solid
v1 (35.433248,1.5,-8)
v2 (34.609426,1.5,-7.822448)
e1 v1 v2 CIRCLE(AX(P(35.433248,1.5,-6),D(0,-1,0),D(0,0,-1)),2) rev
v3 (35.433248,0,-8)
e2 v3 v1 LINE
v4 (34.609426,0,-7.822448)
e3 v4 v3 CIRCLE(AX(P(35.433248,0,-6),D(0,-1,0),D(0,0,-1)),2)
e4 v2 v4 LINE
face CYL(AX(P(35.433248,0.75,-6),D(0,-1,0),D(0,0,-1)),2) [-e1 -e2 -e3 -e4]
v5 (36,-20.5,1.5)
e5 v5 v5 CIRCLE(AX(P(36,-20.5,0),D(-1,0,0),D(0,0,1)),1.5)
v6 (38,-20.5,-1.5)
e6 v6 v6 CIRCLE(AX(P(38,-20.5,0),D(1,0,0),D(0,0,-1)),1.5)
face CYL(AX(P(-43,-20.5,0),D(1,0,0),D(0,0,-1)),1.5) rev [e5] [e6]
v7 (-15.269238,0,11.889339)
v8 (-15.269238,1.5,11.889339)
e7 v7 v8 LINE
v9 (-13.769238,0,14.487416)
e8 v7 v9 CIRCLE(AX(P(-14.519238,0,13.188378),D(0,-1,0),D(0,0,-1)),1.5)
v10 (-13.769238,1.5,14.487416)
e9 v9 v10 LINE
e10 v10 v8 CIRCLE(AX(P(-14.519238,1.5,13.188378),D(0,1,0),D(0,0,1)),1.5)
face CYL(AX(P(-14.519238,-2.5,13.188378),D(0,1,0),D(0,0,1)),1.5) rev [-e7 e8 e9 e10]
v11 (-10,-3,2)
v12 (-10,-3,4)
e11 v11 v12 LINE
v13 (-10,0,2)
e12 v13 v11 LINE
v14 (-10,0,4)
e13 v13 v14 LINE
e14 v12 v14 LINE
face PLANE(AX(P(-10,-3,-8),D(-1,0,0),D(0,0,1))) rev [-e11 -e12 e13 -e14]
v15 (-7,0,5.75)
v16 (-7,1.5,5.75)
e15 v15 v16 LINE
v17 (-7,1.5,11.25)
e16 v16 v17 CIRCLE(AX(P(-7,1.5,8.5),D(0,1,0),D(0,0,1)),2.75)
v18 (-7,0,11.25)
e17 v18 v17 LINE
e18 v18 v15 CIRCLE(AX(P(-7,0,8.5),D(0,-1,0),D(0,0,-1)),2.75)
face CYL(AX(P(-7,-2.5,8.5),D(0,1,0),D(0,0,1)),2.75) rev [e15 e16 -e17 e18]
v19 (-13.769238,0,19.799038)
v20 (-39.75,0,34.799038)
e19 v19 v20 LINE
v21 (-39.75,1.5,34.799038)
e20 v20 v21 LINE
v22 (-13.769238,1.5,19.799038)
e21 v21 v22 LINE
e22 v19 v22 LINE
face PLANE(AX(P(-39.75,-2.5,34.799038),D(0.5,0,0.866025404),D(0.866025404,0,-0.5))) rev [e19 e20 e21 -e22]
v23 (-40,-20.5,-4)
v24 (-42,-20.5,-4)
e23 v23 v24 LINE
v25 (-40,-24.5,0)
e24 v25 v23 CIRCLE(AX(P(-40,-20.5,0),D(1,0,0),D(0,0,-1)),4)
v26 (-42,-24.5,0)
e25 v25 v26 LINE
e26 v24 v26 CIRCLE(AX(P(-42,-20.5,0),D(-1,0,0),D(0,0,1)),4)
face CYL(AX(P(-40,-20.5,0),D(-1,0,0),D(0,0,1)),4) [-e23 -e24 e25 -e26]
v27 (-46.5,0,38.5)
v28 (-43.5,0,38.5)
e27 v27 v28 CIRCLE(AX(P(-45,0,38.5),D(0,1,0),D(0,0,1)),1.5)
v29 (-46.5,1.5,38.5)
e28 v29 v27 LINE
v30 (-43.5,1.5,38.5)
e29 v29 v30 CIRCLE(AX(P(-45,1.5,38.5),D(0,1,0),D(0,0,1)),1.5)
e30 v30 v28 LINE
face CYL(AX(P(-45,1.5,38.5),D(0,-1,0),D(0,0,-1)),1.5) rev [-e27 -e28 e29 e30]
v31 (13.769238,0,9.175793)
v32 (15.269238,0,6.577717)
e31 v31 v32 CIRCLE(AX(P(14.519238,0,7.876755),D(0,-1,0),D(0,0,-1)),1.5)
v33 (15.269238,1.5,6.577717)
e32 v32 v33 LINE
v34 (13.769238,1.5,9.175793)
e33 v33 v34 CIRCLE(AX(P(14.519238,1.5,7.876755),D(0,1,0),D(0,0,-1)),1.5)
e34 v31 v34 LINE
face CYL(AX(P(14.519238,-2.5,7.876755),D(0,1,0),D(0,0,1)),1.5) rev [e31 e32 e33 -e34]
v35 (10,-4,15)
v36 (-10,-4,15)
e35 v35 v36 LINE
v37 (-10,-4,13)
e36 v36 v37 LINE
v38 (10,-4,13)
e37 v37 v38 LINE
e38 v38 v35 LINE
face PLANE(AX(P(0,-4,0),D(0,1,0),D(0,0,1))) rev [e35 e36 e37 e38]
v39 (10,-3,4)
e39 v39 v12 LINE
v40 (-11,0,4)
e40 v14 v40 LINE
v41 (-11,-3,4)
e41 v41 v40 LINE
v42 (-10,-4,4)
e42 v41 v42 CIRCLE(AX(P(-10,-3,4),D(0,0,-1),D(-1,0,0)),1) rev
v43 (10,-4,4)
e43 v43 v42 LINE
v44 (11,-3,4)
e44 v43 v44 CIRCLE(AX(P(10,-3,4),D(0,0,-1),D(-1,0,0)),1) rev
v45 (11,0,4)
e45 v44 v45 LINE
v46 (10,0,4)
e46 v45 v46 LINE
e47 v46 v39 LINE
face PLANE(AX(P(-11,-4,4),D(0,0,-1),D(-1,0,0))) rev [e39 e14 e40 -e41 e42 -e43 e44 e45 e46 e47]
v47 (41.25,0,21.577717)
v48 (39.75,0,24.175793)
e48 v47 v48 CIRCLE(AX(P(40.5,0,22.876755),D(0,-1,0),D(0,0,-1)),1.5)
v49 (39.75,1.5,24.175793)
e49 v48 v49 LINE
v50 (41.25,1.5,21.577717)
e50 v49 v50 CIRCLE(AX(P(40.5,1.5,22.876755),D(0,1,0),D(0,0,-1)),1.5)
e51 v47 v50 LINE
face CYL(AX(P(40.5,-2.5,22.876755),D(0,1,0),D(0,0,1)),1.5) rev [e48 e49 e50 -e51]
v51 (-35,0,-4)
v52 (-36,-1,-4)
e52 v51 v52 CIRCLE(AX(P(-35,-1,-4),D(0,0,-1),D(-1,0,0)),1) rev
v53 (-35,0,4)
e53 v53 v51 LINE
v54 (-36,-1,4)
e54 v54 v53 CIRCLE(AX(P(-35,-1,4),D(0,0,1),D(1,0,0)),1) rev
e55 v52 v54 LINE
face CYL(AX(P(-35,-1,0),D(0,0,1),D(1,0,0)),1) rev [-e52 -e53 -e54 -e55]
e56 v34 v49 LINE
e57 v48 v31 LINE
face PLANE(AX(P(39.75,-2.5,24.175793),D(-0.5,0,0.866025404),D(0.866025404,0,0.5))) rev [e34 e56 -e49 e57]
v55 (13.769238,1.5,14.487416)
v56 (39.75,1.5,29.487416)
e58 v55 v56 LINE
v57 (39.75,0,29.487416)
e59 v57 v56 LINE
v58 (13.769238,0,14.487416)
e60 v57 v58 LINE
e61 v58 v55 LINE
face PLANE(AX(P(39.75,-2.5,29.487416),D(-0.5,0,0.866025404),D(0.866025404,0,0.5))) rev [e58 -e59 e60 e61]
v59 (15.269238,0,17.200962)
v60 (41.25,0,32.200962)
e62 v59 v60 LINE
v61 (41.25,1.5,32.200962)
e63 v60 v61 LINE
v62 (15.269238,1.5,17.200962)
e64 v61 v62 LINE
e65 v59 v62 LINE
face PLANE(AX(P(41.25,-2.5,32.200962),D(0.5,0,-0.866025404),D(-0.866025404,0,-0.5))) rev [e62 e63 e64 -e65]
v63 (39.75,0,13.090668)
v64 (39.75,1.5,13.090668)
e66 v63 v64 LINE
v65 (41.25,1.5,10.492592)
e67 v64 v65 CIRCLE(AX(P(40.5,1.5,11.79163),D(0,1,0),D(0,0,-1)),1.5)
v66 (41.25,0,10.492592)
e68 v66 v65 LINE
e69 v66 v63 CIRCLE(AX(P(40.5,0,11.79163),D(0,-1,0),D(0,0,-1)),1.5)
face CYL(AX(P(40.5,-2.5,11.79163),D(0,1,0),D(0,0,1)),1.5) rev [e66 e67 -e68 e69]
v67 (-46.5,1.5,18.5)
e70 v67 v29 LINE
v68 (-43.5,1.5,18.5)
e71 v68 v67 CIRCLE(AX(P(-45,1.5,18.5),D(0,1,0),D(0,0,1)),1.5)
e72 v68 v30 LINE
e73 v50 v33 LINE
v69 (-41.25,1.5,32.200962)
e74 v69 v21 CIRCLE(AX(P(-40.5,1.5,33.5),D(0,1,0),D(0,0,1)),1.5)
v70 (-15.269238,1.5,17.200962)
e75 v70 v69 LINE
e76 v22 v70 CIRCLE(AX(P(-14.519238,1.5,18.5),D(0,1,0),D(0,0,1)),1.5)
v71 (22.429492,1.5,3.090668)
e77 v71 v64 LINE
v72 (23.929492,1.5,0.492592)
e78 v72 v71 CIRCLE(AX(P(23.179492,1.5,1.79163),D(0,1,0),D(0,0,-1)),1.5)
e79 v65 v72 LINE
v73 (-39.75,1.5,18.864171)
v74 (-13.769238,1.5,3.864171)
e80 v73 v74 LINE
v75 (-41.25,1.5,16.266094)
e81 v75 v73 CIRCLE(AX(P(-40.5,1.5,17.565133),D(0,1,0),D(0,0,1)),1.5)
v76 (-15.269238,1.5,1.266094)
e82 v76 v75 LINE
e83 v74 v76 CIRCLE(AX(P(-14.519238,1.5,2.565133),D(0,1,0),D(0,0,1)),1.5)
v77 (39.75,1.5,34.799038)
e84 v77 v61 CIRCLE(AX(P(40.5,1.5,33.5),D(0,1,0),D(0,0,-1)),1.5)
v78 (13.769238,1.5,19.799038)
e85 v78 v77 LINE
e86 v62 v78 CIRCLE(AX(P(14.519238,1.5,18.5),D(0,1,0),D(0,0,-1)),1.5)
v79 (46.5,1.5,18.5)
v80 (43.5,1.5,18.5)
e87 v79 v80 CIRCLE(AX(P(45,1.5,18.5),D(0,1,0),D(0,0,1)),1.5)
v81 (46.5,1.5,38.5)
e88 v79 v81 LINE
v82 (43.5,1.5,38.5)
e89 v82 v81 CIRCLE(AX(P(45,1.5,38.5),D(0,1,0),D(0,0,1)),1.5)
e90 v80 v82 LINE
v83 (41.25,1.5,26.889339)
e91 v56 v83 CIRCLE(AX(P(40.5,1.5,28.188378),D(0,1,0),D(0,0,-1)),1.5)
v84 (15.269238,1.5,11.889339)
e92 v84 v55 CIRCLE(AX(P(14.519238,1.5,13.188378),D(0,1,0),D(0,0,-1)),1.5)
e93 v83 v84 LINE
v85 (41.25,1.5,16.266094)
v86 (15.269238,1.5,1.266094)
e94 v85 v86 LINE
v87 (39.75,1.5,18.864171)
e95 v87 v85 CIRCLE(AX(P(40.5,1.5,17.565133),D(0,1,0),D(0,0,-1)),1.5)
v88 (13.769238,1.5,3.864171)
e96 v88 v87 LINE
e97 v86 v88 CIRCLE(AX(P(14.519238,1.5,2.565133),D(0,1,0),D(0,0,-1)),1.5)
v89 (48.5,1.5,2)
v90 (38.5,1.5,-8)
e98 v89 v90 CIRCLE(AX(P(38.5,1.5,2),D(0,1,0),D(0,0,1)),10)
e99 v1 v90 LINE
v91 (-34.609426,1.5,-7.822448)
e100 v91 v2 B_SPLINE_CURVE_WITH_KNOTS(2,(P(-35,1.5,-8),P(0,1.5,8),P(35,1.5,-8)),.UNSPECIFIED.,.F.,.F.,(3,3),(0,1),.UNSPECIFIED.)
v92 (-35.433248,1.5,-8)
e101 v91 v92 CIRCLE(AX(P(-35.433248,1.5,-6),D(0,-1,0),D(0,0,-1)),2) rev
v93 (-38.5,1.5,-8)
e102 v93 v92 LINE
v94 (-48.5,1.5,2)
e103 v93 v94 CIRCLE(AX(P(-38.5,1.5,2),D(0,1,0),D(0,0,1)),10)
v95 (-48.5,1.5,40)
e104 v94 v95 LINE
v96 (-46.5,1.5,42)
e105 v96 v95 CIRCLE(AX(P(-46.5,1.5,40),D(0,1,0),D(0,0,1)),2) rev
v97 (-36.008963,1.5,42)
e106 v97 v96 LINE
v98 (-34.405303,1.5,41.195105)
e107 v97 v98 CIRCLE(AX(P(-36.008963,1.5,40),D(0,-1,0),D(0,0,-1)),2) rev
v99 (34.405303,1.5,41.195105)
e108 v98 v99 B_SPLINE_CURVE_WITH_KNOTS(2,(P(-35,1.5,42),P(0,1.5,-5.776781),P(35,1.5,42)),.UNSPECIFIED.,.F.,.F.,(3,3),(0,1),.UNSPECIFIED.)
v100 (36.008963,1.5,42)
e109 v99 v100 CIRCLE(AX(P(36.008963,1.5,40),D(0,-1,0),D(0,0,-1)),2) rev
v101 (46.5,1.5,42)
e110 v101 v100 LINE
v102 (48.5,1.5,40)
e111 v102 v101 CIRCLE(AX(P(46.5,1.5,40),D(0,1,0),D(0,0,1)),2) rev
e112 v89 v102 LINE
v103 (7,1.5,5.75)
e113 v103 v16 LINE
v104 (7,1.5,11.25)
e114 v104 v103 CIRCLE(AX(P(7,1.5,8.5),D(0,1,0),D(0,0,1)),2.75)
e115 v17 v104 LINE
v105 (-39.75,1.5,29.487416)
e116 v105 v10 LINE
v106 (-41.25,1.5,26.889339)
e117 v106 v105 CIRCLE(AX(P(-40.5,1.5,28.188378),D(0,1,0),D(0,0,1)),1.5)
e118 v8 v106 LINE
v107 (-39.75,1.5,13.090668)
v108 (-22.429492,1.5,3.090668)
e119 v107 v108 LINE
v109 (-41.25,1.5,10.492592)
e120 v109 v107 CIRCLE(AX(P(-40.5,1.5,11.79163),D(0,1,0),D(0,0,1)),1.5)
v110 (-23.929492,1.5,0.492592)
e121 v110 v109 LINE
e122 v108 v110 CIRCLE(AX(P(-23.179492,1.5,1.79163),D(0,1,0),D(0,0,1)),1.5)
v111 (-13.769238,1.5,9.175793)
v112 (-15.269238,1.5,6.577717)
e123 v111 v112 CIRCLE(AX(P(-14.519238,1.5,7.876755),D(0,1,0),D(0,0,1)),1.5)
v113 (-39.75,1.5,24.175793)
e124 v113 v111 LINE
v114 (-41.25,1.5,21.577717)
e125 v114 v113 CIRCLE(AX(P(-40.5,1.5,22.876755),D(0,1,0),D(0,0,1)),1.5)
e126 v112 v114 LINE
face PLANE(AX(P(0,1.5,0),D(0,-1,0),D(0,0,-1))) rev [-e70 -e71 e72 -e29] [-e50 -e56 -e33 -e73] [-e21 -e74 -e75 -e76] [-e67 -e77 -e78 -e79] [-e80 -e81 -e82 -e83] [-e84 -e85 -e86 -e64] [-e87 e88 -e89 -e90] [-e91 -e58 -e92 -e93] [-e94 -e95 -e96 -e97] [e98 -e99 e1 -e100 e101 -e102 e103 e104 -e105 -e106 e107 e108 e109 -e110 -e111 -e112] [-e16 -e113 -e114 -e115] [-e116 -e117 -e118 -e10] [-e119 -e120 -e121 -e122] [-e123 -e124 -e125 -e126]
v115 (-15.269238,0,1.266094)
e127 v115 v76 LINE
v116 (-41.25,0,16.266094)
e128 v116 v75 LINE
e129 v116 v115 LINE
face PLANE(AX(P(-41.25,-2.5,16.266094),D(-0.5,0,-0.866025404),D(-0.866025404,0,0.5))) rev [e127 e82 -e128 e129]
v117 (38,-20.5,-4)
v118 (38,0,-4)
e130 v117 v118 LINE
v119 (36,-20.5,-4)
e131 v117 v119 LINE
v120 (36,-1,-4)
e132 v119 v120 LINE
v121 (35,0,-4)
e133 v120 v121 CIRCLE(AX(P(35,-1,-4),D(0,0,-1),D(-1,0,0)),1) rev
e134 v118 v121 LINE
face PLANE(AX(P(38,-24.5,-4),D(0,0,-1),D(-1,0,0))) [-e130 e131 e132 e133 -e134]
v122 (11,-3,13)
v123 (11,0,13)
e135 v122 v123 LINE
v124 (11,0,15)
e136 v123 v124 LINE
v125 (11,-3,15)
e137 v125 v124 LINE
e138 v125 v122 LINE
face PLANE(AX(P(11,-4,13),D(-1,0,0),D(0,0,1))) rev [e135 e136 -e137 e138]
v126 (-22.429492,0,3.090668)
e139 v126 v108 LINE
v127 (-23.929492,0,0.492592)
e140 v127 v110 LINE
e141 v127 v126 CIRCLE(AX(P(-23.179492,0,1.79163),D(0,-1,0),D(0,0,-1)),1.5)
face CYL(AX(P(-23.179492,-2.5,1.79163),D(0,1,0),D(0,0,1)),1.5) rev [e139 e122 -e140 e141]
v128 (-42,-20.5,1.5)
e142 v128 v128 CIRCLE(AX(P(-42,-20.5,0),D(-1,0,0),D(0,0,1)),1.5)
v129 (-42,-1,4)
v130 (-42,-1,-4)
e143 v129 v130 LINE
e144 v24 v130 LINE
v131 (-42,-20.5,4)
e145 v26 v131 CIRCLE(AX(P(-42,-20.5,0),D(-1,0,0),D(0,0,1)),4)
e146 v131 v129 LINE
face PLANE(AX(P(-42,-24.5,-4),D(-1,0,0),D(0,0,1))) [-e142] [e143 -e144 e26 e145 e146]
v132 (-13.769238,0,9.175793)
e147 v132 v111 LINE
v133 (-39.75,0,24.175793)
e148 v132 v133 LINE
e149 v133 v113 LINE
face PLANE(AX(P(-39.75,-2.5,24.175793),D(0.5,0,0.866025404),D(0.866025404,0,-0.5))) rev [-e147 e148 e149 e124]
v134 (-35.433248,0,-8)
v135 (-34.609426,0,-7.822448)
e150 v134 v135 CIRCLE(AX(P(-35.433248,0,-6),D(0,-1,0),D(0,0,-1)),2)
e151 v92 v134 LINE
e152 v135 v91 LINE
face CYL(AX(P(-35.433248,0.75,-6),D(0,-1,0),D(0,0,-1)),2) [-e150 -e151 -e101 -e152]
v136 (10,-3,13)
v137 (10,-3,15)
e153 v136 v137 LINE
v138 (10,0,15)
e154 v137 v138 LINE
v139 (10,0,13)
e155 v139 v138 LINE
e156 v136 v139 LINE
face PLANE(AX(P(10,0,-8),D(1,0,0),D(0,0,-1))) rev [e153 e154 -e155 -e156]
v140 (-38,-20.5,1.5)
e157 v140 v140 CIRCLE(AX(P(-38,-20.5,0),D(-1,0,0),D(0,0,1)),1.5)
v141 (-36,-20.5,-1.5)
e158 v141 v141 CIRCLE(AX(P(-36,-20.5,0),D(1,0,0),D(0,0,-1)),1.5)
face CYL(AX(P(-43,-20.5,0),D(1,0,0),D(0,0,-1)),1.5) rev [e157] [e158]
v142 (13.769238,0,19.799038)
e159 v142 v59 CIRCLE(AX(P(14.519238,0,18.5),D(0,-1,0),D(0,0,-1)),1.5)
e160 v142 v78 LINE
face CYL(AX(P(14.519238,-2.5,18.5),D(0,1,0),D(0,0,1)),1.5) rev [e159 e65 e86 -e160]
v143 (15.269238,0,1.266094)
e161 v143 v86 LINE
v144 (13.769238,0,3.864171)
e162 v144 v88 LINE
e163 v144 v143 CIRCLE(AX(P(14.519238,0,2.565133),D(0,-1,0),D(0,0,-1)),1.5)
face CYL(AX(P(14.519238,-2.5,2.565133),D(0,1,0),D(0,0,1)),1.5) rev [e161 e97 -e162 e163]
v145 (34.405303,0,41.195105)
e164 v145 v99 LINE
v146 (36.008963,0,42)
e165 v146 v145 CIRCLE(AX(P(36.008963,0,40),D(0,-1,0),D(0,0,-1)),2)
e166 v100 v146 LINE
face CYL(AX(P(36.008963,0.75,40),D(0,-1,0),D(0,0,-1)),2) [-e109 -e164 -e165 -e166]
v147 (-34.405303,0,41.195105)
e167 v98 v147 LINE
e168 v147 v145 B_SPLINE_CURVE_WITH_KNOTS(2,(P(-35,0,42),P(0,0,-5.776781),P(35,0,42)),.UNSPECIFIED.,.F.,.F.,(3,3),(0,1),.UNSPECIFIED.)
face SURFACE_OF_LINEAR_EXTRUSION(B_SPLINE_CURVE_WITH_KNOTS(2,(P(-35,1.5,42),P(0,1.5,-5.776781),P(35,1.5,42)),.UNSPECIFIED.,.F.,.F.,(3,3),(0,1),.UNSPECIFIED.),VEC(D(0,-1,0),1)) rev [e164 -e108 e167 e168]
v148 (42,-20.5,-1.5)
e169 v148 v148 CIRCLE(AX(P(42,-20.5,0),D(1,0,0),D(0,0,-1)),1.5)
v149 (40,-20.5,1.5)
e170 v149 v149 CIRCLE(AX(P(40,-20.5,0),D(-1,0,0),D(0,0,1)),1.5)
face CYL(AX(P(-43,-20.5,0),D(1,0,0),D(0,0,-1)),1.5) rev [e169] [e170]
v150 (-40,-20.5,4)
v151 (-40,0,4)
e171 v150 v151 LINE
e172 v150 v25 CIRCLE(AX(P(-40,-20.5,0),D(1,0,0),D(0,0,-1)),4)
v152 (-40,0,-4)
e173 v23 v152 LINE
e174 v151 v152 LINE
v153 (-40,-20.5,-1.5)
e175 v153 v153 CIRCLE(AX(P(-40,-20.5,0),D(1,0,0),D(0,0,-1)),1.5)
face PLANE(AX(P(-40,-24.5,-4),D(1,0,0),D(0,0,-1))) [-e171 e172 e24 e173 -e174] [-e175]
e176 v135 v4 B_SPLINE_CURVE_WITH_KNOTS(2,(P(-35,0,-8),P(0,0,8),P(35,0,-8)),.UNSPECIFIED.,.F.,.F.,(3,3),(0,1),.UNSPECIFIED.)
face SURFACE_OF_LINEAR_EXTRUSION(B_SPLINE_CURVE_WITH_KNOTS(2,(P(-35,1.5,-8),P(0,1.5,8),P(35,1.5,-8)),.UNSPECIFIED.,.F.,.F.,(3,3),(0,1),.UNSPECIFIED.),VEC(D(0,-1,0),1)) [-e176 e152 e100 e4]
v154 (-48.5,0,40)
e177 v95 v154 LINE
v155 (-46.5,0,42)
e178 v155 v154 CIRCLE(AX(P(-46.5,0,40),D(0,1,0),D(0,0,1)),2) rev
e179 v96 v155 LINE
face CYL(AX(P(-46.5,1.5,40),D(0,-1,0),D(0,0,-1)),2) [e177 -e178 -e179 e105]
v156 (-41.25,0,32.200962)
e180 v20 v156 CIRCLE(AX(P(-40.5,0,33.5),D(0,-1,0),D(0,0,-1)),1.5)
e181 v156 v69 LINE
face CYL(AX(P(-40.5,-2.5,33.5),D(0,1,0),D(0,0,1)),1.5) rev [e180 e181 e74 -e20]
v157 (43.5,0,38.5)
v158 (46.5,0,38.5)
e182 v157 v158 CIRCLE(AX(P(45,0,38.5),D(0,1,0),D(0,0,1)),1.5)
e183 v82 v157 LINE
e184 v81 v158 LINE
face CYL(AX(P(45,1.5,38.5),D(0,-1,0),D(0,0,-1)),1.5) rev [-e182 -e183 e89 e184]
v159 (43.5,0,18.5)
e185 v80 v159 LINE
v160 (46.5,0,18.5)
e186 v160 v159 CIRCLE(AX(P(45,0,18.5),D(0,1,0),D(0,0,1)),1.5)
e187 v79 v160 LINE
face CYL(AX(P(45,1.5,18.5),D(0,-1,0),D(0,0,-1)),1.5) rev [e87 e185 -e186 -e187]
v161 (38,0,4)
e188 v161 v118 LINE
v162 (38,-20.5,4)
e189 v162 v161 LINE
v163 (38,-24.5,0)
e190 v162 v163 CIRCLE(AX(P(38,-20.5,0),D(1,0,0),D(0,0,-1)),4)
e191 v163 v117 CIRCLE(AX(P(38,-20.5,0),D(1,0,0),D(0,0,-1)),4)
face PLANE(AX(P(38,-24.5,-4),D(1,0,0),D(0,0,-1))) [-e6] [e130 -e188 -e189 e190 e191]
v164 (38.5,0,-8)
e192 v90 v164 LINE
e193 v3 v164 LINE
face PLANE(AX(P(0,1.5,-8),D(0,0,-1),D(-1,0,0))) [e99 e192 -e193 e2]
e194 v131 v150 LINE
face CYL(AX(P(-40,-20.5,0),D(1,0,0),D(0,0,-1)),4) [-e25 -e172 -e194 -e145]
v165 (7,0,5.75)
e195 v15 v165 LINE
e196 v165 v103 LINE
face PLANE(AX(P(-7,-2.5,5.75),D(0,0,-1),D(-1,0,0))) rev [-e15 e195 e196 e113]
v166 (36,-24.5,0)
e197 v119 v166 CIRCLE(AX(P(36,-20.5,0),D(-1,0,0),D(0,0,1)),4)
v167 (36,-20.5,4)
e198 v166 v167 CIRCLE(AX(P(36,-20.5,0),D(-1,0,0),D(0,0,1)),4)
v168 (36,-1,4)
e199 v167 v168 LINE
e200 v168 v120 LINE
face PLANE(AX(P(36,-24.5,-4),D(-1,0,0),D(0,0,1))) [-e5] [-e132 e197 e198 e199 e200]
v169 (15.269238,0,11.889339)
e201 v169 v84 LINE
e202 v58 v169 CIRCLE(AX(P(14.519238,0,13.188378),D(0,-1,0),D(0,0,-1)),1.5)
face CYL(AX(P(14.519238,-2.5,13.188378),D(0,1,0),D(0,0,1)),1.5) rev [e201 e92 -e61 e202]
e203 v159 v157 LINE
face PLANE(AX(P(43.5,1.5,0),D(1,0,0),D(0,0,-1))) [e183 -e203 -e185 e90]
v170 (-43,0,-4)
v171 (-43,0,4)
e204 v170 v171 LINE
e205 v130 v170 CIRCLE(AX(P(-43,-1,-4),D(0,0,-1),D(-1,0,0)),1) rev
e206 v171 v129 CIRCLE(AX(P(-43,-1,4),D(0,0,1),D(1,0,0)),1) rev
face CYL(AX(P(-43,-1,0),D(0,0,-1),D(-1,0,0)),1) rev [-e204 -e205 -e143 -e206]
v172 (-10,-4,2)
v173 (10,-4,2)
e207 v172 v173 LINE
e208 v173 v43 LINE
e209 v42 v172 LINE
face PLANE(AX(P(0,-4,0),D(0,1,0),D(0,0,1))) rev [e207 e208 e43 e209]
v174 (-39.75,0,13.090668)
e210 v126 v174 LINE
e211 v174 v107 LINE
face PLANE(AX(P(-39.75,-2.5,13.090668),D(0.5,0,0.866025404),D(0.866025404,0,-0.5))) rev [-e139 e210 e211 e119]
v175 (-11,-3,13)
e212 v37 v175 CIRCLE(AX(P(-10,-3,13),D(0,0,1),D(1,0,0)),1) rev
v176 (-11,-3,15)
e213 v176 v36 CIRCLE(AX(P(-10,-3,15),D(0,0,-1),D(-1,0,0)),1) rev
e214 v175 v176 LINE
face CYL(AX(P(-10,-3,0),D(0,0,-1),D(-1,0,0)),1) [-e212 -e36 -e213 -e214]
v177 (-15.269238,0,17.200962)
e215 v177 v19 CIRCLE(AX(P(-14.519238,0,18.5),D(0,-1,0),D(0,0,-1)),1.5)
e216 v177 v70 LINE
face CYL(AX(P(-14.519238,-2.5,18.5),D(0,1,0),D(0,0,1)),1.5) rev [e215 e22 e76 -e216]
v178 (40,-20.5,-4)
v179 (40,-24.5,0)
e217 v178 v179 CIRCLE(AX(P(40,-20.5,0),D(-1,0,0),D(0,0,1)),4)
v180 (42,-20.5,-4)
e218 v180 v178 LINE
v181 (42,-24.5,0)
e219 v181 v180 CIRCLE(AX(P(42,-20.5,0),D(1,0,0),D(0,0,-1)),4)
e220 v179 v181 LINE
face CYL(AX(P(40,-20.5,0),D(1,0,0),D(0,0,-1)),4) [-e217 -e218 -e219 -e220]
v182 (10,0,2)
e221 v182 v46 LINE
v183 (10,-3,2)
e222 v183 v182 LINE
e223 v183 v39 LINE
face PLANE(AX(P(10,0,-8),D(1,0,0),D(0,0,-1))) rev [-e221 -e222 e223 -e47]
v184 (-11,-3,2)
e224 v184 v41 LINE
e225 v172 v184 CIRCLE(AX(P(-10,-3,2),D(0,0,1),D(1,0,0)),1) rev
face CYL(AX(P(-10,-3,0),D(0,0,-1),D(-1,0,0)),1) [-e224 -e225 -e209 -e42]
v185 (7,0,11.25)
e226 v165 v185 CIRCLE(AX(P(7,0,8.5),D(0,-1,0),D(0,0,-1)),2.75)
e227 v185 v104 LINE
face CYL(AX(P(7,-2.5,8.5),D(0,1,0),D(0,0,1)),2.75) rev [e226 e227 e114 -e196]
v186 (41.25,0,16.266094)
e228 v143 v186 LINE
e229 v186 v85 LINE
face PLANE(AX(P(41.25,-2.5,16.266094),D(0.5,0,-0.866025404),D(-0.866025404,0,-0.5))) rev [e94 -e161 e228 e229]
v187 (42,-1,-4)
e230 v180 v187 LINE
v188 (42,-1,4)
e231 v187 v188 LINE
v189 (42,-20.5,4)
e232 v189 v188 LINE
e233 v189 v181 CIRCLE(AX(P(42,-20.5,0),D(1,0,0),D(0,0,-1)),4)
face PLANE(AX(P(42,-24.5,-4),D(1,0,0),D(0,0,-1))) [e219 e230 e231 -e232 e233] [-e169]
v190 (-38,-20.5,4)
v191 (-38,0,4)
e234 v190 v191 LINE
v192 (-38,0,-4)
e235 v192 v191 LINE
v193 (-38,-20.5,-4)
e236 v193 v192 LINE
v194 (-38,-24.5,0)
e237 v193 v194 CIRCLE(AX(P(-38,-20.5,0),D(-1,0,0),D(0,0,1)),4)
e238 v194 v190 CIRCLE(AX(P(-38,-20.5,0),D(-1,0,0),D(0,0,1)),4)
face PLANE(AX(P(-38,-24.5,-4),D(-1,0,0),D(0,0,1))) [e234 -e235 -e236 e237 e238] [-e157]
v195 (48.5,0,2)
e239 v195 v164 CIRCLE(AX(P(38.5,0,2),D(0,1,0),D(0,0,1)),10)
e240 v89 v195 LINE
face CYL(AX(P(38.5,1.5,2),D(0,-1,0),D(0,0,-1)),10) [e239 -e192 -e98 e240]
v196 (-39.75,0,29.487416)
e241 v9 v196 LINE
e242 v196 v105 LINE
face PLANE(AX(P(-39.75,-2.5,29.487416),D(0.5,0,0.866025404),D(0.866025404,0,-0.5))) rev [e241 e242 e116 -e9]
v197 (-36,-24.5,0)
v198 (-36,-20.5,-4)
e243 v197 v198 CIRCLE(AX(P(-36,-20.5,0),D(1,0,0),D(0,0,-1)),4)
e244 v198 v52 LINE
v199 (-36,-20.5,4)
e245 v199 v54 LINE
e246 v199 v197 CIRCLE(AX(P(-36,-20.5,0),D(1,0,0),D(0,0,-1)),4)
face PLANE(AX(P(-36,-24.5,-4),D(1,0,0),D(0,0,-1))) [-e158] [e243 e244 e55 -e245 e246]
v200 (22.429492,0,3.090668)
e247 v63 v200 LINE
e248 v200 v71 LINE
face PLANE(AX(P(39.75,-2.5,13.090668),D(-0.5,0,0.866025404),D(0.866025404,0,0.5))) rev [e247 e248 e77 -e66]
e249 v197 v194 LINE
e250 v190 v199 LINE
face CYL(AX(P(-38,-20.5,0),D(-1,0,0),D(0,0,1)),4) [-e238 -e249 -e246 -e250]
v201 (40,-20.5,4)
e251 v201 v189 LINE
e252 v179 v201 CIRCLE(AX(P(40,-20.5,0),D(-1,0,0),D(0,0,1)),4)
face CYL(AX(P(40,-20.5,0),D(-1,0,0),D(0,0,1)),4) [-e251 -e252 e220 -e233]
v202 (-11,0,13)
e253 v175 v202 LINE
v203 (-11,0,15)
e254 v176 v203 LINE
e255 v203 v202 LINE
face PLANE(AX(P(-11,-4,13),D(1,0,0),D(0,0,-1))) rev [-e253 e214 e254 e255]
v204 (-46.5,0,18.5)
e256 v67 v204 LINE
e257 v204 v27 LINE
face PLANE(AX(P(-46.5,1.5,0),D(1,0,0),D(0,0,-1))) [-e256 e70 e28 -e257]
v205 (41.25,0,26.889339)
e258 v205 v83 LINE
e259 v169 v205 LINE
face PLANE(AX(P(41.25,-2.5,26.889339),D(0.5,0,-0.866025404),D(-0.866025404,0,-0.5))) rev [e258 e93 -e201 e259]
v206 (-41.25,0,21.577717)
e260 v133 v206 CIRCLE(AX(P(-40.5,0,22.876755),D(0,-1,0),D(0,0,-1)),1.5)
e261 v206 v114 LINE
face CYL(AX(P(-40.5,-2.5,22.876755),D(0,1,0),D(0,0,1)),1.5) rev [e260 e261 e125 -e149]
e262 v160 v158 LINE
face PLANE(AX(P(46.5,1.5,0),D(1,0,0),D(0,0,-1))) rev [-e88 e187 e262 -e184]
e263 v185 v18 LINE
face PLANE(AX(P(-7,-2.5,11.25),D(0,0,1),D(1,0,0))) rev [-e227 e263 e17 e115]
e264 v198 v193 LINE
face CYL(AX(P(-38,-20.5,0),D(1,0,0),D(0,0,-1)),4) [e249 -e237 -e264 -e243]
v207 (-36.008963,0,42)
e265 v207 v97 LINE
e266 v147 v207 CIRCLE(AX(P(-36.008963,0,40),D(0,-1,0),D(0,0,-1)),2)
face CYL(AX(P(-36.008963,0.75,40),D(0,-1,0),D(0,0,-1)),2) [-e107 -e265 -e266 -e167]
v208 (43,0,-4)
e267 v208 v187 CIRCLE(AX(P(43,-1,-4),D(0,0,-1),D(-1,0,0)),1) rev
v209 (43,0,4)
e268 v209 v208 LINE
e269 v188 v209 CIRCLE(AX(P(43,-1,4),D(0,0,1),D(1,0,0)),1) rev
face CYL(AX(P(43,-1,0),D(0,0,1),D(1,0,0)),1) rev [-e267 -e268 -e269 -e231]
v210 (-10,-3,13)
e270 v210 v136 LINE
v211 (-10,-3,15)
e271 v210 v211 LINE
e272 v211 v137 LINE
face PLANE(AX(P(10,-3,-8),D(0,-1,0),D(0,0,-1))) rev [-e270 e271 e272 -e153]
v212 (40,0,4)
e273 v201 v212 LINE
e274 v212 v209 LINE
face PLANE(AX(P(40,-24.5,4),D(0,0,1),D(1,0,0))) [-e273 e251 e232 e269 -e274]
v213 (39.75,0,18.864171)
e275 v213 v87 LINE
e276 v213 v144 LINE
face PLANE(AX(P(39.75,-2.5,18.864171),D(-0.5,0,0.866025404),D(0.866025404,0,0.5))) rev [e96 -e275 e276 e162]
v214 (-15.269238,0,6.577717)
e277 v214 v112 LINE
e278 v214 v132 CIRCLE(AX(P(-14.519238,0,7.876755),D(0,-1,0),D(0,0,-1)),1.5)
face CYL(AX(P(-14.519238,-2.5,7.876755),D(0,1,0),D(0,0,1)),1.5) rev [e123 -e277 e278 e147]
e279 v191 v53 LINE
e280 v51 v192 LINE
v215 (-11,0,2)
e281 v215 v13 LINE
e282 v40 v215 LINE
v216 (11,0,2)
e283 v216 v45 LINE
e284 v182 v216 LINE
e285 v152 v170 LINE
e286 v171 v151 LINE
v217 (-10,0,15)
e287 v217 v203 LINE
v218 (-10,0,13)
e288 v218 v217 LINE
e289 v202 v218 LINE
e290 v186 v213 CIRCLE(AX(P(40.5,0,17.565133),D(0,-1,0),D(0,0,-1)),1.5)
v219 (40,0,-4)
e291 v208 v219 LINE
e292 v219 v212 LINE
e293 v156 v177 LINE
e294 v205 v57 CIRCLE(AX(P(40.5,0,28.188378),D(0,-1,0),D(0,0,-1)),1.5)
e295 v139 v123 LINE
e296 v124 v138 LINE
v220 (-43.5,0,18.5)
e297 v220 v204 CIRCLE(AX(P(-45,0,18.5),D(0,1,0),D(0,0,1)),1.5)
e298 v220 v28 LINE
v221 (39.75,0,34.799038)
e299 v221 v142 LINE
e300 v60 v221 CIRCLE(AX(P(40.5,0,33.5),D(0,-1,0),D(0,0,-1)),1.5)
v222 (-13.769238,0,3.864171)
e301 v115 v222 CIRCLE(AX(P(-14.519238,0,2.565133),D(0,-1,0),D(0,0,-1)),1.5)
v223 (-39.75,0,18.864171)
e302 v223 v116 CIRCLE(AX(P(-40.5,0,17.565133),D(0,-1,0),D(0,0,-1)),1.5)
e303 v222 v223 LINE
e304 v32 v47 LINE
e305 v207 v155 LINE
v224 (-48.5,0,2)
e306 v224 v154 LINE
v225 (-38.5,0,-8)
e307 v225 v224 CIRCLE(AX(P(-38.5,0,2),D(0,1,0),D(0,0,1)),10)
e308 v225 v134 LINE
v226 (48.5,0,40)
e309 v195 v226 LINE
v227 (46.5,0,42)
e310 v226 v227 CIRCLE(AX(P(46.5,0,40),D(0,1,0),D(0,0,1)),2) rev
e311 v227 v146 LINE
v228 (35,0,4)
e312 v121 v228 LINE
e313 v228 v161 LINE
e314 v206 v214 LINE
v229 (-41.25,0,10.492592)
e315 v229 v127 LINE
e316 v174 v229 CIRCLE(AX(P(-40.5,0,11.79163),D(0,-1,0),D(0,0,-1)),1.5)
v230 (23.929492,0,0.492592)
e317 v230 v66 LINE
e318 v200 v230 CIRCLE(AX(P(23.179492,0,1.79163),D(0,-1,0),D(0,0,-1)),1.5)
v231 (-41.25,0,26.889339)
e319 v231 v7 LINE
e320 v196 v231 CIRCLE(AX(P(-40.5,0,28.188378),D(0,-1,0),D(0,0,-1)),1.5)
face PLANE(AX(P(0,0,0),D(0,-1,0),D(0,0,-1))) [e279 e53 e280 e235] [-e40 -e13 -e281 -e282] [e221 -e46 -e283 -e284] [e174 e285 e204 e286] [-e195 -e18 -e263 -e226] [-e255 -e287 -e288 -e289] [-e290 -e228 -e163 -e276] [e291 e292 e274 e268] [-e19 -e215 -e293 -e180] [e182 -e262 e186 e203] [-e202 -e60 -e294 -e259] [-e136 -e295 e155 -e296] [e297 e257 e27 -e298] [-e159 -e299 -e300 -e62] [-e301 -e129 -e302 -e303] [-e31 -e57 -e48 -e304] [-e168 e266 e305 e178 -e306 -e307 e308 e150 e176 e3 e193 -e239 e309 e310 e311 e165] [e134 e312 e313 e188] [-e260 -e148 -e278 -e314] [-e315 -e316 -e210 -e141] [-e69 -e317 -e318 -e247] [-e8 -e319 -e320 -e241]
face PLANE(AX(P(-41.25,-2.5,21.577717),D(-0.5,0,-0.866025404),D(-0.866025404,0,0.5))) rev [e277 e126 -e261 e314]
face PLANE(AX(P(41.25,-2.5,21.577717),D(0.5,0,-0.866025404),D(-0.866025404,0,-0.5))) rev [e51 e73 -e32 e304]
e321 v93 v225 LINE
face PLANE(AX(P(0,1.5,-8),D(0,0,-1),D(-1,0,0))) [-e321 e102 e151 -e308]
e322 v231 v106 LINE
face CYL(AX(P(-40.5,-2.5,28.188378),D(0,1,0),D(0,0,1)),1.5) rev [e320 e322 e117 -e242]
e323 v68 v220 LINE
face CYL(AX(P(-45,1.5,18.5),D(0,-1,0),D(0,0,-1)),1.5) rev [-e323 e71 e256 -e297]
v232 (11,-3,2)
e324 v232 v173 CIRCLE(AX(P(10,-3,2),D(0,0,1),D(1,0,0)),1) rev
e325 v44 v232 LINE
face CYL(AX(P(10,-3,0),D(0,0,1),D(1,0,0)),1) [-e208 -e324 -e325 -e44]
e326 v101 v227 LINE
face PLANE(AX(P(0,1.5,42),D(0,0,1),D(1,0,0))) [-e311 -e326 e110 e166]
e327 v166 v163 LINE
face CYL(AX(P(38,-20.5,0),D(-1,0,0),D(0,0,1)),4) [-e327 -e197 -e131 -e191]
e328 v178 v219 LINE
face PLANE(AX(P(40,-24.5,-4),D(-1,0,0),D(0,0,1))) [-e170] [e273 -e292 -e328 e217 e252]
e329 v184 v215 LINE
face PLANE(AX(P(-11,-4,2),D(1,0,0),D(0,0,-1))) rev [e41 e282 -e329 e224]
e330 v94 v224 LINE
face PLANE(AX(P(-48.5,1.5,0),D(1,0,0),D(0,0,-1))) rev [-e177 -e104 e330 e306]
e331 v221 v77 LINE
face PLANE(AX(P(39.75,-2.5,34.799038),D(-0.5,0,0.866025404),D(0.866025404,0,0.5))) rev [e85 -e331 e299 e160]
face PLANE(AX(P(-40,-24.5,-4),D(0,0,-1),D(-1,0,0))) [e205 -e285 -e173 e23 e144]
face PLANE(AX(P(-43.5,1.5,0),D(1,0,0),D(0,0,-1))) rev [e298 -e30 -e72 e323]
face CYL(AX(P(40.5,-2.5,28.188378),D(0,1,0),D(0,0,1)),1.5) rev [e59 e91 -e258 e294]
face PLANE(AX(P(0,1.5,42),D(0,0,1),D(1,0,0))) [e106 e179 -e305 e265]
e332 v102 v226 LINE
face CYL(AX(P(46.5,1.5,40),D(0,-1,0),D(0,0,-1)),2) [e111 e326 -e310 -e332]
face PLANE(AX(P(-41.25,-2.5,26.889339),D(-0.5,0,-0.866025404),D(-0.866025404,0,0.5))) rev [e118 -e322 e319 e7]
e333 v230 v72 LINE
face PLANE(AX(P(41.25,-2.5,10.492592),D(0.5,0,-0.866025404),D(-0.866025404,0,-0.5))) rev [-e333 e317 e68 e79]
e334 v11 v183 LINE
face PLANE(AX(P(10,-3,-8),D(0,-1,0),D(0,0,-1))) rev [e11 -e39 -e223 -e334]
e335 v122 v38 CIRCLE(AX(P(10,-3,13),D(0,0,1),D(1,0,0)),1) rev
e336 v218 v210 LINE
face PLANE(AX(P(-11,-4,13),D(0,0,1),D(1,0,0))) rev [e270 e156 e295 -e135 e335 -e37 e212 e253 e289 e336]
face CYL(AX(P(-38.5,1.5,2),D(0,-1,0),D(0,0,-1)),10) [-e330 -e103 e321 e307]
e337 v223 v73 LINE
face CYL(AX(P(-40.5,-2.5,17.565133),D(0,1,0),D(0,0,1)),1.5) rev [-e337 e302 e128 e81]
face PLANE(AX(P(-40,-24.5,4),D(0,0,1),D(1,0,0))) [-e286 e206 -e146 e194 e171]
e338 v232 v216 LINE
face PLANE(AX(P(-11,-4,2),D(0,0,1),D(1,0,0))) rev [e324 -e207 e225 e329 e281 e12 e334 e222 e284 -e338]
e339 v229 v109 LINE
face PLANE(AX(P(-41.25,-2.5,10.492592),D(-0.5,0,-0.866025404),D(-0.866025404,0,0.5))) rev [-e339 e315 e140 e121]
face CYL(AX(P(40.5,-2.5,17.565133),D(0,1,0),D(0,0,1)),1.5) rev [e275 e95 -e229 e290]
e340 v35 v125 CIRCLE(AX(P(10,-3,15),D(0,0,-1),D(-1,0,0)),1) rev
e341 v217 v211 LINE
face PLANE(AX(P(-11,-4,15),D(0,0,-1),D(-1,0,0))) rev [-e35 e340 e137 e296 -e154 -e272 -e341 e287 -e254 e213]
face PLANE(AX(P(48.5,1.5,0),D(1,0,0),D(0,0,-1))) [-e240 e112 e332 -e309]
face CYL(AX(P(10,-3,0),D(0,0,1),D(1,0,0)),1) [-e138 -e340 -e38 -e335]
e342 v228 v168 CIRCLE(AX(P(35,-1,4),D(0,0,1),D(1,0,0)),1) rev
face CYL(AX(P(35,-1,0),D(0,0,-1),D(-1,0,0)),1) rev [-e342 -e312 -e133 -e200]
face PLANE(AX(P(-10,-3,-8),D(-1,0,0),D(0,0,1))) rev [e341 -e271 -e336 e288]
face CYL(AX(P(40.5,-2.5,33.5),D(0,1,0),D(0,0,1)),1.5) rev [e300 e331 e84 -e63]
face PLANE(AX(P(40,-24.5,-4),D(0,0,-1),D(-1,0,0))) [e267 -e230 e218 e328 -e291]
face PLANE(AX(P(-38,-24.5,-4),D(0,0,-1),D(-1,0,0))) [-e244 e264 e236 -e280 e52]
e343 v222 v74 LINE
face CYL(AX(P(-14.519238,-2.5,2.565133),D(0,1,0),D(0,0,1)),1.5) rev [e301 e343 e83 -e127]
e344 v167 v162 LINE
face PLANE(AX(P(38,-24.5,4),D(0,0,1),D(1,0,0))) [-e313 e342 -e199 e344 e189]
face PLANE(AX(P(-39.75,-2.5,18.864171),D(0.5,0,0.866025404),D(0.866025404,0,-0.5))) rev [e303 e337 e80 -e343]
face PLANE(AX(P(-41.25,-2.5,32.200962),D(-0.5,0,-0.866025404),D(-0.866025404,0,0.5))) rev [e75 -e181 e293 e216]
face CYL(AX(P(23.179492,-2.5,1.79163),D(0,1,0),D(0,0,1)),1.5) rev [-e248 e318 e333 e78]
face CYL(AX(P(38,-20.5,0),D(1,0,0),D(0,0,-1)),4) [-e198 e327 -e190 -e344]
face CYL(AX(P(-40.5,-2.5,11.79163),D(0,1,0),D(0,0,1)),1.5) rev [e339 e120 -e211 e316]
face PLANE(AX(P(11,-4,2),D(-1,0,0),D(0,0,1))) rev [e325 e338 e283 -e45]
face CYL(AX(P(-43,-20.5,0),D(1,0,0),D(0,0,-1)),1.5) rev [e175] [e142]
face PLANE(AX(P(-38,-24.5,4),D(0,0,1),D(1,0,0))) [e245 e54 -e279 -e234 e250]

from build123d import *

# Parameters (mm, degrees)
SKETCH_2_W          = 8
SKETCH_2_H          = 12
EXTRUDE_1_DEPTH     = 1.5
EXTRUDE_1_2_DEPTH   = 1.5
SKETCH_3_W          = 2
SKETCH_3_H          = 8
EXTRUDE_2_DEPTH     = 24.5
FILLET_1_R          = 4
FILLET_2_R          = 4
SKETCH_4_R          = 1.5
CUT_EXTRUDE_1_DEPTH = 90.622820755
EXTRUDE_3_DEPTH     = 1.5
SKETCH_8_W          = 22
SKETCH_8_H          = 2
EXTRUDE_4_DEPTH     = 4
SKETCH_9_W          = 20
SKETCH_9_H          = 3
CUT_EXTRUDE_2_DEPTH = 61.675365801
FILLET_4_R          = 2
CUT_EXTRUDE_4_DEPTH = 4
FILLET_5_R          = 1
FILLET_6_R          = 1


with BuildPart() as part:
    # 草图2 → 凸台-拉伸1 (new body)
    with BuildSketch(Plane(origin=(0, 0, 0), x_dir=(1, 0, 0), z_dir=(0, 1, 0))):
        with Locations((-39, 0)):
            Rectangle(SKETCH_2_W, SKETCH_2_H)
    extrude(amount=EXTRUDE_1_DEPTH)



with BuildPart() as body_2:
    # 草图2 → Extrude 1 2 (new body)
    with BuildSketch(Plane(origin=(0, 0, 0), x_dir=(1, 0, 0), z_dir=(0, 1, 0))):
        with Locations((39, 0)):
            Rectangle(SKETCH_2_W, SKETCH_2_H)
    extrude(amount=EXTRUDE_1_2_DEPTH)


with BuildPart() as part_1:
    add(part.part)

    add(body_2.part)  # 凸台-拉伸2 merges body 2
    # 草图3 → 凸台-拉伸2 (add)
    with BuildSketch(Plane(origin=(0, 0, 0), x_dir=(1, 0, 0), z_dir=(0, 1, 0))):
        with Locations((-37, 0)):
            Rectangle(SKETCH_3_W, SKETCH_3_H)
        with Locations((-41, 0)):
            Rectangle(SKETCH_3_W, SKETCH_3_H)
        with Locations((41, 0)):
            Rectangle(SKETCH_3_W, SKETCH_3_H)
        with Locations((37, 0)):
            Rectangle(SKETCH_3_W, SKETCH_3_H)
    extrude(amount=-EXTRUDE_2_DEPTH)

    # 圆角1
    fillet_1_edges = [part_1.edges().sort_by_distance(p)[0] for p in [
        (-41, -24.5, -4),
        (-37, -24.5, -4),
        (-37, -24.5, 4),
        (-41, -24.5, 4),
    ]]
    fillet(fillet_1_edges, radius=FILLET_1_R - 0.0001)  # a hair under: the kernel refuses the full size

    # 圆角2
    fillet_2_edges = [part_1.edges().sort_by_distance(p)[0] for p in [
        (37, -24.5, 4),
        (41, -24.5, 4),
        (41, -24.5, -4),
        (37, -24.5, -4),
    ]]
    fillet(fillet_2_edges, radius=FILLET_2_R - 0.0001)  # a hair under: the kernel refuses the full size

    # 草图4 → 切除-拉伸1 (cut, through all)
    with BuildSketch(Plane(origin=(43, 0, 0), x_dir=(0, 0, -1), z_dir=(1, 0, 0))):
        with Locations((0, -20.5)):
            Circle(SKETCH_4_R)
    extrude(amount=-CUT_EXTRUDE_1_DEPTH, mode=Mode.SUBTRACT)

    # 草图6 → 凸台-拉伸3 (add)
    with BuildSketch(Plane(origin=(0, 0, 0), x_dir=(1, 0, 0), z_dir=(0, 1, 0))):
        with BuildLine():
            Line((48.5, -2), (48.5, -40))
            ThreePointArc((48.5, -40), (47.914213562, -41.414213562), (46.5, -42))
            Line((46.5, -42), (35, -42))
            add(Edge.make_bspline(
                [(-35, -42), (0, 5.776780805), (35, -42)],
                knots=[0, 0, 0, 1, 1, 1], degree=2))
            Line((-35, -42), (-46.5, -42))
            ThreePointArc((-46.5, -42), (-47.914213562, -41.414213562), (-48.5, -40))
            Line((-48.5, -40), (-48.5, -2))
            ThreePointArc((-48.5, -2), (-45.571067812, 5.071067812), (-38.5, 8))
            Line((-38.5, 8), (-35, 8))
            add(Edge.make_bspline(
                [(-35, 8), (0, -8), (35, 8)],
                knots=[0, 0, 0, 1, 1, 1], degree=2))
            Line((35, 8), (38.5, 8))
            ThreePointArc((38.5, 8), (45.571067812, 5.071067812), (48.5, -2))
        make_face()
        with BuildLine():
            Line((-43.5, -18.5), (-43.5, -38.5))
            ThreePointArc((-43.5, -38.5), (-45, -40), (-46.5, -38.5))
            Line((-46.5, -38.5), (-46.5, -18.5))
            ThreePointArc((-46.5, -18.5), (-45, -17), (-43.5, -18.5))
        make_face(mode=Mode.SUBTRACT)
        with BuildLine():
            Line((46.5, -18.5), (46.5, -38.5))
            ThreePointArc((46.5, -38.5), (45, -40), (43.5, -38.5))
            Line((43.5, -38.5), (43.5, -18.5))
            ThreePointArc((43.5, -18.5), (45, -17), (46.5, -18.5))
        make_face(mode=Mode.SUBTRACT)
    extrude(amount=EXTRUDE_3_DEPTH)

    # 草图8 → 凸台-拉伸4 (add)
    with BuildSketch(Plane(origin=(0, 0, 0), x_dir=(-1, 0, 0), z_dir=(0, -1, 0))):
        with Locations((0, -3)):
            Rectangle(SKETCH_8_W, SKETCH_8_H)
        with Locations((0, -14)):
            Rectangle(SKETCH_8_W, SKETCH_8_H)
    extrude(amount=EXTRUDE_4_DEPTH)

    # 草图9 → 切除-拉伸2 (cut, through all)
    with BuildSketch(Plane.XY.offset(15)):
        with Locations((0, -1.5)):
            Rectangle(SKETCH_9_W, SKETCH_9_H)
    extrude(amount=-CUT_EXTRUDE_2_DEPTH, mode=Mode.SUBTRACT)

    # 圆角4
    fillet_4_edges = [part_1.edges().sort_by_distance(p)[0] for p in [
        (-35, 0.75, -8),
        (35, 0.75, -8),
        (35, 0.75, 42),
        (-35, 0.75, 42),
    ]]
    fillet(fillet_4_edges, radius=FILLET_4_R)

    # 草图13 → 切除-拉伸4 (cut)
    with BuildSketch(Plane(origin=(0, 1.5, 0), x_dir=(1, 0, 0), z_dir=(0, 1, 0))):
        with BuildLine():
            Line((-41.25, -32.200961894), (-15.269237886, -17.200961894))
            ThreePointArc((-15.269237886, -17.200961894), (-13.220199781, -17.75), (-13.769237886, -19.799038106))
            Line((-13.769237886, -19.799038106), (-39.75, -34.799038106))
            ThreePointArc((-39.75, -34.799038106), (-41.799038106, -34.25), (-41.25, -32.200961894))
        make_face()
        with BuildLine():
            Line((-41.25, -26.889339418), (-15.269237886, -11.889339418))
            ThreePointArc((-15.269237886, -11.889339418), (-13.220199781, -12.438377523), (-13.769237886, -14.487415629))
            Line((-13.769237886, -14.487415629), (-39.75, -29.487415629))
            ThreePointArc((-39.75, -29.487415629), (-41.799038106, -28.938377523), (-41.25, -26.889339418))
        make_face()
        with BuildLine():
            Line((-41.25, -21.577716941), (-15.269237886, -6.577716941))
            ThreePointArc((-15.269237886, -6.577716941), (-13.220199781, -7.126755047), (-13.769237886, -9.175793153))
            Line((-13.769237886, -9.175793153), (-39.75, -24.175793153))
            ThreePointArc((-39.75, -24.175793153), (-41.799038106, -23.626755047), (-41.25, -21.577716941))
        make_face()
        with BuildLine():
            Line((-41.25, -16.266094465), (-15.269237886, -1.266094465))
            ThreePointArc((-15.269237886, -1.266094465), (-13.220199781, -1.81513257), (-13.769237886, -3.864170676))
            Line((-13.769237886, -3.864170676), (-39.75, -18.864170676))
            ThreePointArc((-39.75, -18.864170676), (-41.799038106, -18.31513257), (-41.25, -16.266094465))
        make_face()
        with BuildLine():
            Line((-41.25, -10.492591773), (-23.929491924, -0.492591773))
            ThreePointArc((-23.929491924, -0.492591773), (-21.880453819, -1.041629878), (-22.429491924, -3.090667984))
            Line((-22.429491924, -3.090667984), (-39.75, -13.090667984))
            ThreePointArc((-39.75, -13.090667984), (-41.799038106, -12.541629878), (-41.25, -10.492591773))
        make_face()
        with BuildLine():
            Line((-7, -5.75), (7, -5.75))
            ThreePointArc((7, -5.75), (9.75, -8.5), (7, -11.25))
            Line((7, -11.25), (-7, -11.25))
            ThreePointArc((-7, -11.25), (-9.75, -8.5), (-7, -5.75))
        make_face()
        with BuildLine():
            Line((41.25, -32.200961894), (15.269237886, -17.200961894))
            ThreePointArc((15.269237886, -17.200961894), (13.220199781, -17.75), (13.769237886, -19.799038106))
            Line((13.769237886, -19.799038106), (39.75, -34.799038106))
            ThreePointArc((39.75, -34.799038106), (41.799038106, -34.25), (41.25, -32.200961894))
        make_face()
        with BuildLine():
            Line((41.25, -26.889339418), (15.269237886, -11.889339418))
            ThreePointArc((15.269237886, -11.889339418), (13.220199781, -12.438377523), (13.769237886, -14.487415629))
            Line((13.769237886, -14.487415629), (39.75, -29.487415629))
            ThreePointArc((39.75, -29.487415629), (41.799038106, -28.938377523), (41.25, -26.889339418))
        make_face()
        with BuildLine():
            Line((41.25, -21.577716941), (15.269237886, -6.577716941))
            ThreePointArc((15.269237886, -6.577716941), (13.220199781, -7.126755047), (13.769237886, -9.175793153))
            Line((13.769237886, -9.175793153), (39.75, -24.175793153))
            ThreePointArc((39.75, -24.175793153), (41.799038106, -23.626755047), (41.25, -21.577716941))
        make_face()
        with BuildLine():
            Line((41.25, -16.266094465), (15.269237886, -1.266094465))
            ThreePointArc((15.269237886, -1.266094465), (13.220199781, -1.81513257), (13.769237886, -3.864170676))
            Line((13.769237886, -3.864170676), (39.75, -18.864170676))
            ThreePointArc((39.75, -18.864170676), (41.799038106, -18.31513257), (41.25, -16.266094465))
        make_face()
        with BuildLine():
            Line((41.25, -10.492591773), (23.929491924, -0.492591773))
            ThreePointArc((23.929491924, -0.492591773), (21.880453819, -1.041629878), (22.429491924, -3.090667984))
            Line((22.429491924, -3.090667984), (39.75, -13.090667984))
            ThreePointArc((39.75, -13.090667984), (41.799038106, -12.541629878), (41.25, -10.492591773))
        make_face()
    extrude(amount=-CUT_EXTRUDE_4_DEPTH, mode=Mode.SUBTRACT)

    # 圆角5
    fillet_5_edges = [part_1.edges().sort_by_distance(p)[0] for p in [
        (36, 0, 0),
        (42, 0, 0),
        (-36, 0, 0),
        (-42, 0, 0),
    ]]
    fillet(fillet_5_edges, radius=FILLET_5_R)

    # 圆角6
    fillet_6_edges = [part_1.edges().sort_by_distance(p)[0] for p in [
        (11, -4, 3),
        (-11, -4, 3),
        (11, -4, 14),
        (-11, -4, 14),
    ]]
    fillet(fillet_6_edges, radius=FILLET_6_R)


solid = part_1.part
